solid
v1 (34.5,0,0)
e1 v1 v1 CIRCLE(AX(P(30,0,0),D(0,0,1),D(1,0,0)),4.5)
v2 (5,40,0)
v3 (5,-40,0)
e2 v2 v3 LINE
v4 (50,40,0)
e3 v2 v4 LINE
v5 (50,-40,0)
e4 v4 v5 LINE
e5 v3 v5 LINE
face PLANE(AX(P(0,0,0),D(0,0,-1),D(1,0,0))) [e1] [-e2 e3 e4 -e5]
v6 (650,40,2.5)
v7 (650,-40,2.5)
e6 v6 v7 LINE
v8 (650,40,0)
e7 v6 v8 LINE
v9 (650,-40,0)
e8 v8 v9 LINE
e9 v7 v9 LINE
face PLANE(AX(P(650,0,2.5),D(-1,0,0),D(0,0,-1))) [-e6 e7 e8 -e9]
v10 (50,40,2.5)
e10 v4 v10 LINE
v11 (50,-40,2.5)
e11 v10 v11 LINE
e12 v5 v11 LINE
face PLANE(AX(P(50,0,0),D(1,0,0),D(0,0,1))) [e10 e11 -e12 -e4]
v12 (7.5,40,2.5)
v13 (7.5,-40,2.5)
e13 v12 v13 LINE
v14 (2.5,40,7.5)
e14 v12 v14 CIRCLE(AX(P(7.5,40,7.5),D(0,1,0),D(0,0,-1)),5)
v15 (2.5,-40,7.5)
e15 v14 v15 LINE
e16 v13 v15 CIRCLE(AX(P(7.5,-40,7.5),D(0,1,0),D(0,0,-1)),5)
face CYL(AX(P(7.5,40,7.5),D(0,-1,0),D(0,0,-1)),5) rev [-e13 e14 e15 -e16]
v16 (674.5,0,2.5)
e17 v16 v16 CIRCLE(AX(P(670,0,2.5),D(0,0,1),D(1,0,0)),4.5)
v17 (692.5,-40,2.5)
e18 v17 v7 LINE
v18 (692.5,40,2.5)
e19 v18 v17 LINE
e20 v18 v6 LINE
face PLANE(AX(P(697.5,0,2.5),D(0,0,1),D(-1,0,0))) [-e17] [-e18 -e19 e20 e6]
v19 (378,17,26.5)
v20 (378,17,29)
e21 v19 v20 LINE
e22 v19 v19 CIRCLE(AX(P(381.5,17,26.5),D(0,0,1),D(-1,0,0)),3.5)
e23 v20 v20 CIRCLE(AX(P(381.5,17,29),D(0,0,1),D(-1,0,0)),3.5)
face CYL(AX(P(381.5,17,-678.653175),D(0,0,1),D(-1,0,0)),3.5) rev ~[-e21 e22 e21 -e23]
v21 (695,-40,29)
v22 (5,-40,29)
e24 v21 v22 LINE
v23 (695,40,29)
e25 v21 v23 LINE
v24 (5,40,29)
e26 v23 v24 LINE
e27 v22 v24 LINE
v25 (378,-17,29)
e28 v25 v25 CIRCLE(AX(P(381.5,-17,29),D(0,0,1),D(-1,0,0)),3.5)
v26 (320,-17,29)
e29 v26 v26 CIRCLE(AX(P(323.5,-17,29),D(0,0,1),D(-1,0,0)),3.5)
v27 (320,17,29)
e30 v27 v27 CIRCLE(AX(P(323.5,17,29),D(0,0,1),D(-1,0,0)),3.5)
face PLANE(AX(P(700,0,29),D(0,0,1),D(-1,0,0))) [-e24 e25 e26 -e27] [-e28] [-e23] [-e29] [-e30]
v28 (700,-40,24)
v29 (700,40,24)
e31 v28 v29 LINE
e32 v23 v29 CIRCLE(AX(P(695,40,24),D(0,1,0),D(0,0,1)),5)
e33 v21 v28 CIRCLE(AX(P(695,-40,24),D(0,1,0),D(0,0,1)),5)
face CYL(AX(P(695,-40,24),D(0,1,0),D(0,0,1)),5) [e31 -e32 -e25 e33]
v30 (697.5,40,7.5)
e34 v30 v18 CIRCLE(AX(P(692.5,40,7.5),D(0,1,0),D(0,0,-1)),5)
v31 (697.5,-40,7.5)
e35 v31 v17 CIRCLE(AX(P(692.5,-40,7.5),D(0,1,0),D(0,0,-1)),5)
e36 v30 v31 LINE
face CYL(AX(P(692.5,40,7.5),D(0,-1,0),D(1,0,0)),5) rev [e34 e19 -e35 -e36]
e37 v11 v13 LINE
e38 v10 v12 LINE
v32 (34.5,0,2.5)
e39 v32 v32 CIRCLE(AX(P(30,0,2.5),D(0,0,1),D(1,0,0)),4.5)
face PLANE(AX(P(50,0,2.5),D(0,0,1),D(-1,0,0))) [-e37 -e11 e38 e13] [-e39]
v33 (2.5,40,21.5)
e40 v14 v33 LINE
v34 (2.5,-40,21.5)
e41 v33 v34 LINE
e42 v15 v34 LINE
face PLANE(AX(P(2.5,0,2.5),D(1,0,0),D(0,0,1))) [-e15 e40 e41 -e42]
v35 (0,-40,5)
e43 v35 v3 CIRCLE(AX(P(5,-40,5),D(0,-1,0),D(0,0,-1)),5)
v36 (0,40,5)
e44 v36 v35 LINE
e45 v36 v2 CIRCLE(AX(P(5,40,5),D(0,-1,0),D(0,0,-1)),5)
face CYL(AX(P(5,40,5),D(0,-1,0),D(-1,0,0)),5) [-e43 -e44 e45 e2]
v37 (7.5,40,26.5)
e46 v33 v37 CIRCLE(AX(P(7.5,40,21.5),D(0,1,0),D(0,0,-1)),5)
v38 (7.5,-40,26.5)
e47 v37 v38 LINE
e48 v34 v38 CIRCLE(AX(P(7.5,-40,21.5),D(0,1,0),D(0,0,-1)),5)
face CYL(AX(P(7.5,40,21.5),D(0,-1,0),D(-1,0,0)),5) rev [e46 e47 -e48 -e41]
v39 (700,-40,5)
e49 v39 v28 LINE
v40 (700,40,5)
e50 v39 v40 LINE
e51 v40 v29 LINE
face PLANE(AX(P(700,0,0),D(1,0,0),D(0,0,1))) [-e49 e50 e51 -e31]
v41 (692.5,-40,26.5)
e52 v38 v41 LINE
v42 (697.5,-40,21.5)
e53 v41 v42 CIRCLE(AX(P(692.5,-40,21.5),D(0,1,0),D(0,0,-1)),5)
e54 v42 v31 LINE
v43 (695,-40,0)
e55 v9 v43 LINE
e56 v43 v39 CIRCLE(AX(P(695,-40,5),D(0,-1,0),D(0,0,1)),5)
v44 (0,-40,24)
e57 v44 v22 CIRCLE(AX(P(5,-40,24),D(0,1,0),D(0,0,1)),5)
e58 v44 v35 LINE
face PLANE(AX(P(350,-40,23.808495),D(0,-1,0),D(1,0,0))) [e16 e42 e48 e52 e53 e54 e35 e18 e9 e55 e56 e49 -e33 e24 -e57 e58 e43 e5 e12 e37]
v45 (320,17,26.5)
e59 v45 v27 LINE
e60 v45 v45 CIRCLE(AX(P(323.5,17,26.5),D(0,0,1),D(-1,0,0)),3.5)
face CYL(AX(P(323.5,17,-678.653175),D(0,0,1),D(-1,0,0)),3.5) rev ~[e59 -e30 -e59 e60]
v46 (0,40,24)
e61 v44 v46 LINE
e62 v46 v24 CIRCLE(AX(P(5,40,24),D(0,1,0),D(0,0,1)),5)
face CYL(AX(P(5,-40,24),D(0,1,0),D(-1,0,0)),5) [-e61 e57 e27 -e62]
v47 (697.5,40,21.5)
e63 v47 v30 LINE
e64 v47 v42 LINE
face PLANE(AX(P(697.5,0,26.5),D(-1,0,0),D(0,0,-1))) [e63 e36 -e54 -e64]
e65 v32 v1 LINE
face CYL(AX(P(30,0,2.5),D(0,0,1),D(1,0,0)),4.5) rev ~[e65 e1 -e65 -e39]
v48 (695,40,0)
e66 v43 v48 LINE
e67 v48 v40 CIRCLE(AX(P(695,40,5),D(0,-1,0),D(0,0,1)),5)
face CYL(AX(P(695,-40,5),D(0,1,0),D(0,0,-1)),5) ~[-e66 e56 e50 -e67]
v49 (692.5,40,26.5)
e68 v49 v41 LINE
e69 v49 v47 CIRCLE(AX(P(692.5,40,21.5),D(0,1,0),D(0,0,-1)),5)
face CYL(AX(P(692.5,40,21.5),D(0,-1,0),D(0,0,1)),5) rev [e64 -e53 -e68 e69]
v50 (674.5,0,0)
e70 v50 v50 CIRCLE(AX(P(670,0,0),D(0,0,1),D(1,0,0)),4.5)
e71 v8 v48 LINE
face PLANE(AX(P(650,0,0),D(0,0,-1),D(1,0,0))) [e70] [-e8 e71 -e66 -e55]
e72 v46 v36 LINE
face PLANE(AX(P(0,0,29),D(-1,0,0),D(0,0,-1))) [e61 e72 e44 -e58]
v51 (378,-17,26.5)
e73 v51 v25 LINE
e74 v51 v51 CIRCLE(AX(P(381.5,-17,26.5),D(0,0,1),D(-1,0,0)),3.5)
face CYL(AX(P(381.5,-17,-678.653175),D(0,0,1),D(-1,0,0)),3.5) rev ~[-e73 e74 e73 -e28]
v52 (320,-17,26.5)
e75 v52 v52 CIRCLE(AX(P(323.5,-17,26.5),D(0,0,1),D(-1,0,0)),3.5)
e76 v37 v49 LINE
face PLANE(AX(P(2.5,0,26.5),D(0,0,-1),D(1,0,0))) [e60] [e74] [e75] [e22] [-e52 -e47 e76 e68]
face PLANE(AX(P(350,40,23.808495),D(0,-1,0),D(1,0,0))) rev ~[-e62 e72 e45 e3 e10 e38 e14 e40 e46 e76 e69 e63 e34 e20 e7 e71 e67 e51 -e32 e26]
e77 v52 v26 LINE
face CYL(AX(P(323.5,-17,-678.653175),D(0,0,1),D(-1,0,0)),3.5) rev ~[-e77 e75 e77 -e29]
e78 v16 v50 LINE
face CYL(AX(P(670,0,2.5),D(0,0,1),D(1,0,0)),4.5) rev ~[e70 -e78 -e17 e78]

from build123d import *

# Parameters (mm, degrees)
F1_DEPTH = 40
F4_D     = 9
F4_DEPTH = 12
F4_TIP   = 2.7038727856
F5_D     = 9
F5_DEPTH = 12
F5_TIP   = 2.7038727856
F7_D     = 7
F8_R     = 5


# Not quite as in the source:
# - a feature names something its author has since deleted; it is built from what else it names


with BuildPart() as f1:
    # F0 (on Front) → F1 (new body, symmetric)
    with BuildSketch(Plane.XZ):
        Polygon((0, 29), (0, 0), (50, 0), (50, 2.5), (2.5, 2.5), (2.5, 26.5), (697.5, 26.5), (697.5, 2.5), (650, 2.5), (650, 0), (700, 0), (700, 29), align=None)
    extrude(amount=F1_DEPTH, both=True)

    # F4 (one way)
    with BuildSketch(Plane.XY.offset(2.5)):
        with Locations((670, 0)):
            Circle(F4_D / 2)
    extrude(amount=-F4_DEPTH, mode=Mode.SUBTRACT)
    with Locations(Plane.XY.offset(2.5)):
        with Locations((670, 0)):
            with Locations((0, 0, -(F4_DEPTH + F4_TIP / 2))):  # 118° drill point
                Cone(0, F4_D / 2, F4_TIP, mode=Mode.SUBTRACT)

    # F5 (one way)
    with BuildSketch(Plane.XY.offset(2.5)):
        with Locations((30, 0)):
            Circle(F5_D / 2)
    extrude(amount=-F5_DEPTH, mode=Mode.SUBTRACT)
    with Locations(Plane.XY.offset(2.5)):
        with Locations((30, 0)):
            with Locations((0, 0, -(F5_DEPTH + F5_TIP / 2))):  # 118° drill point
                Cone(0, F5_D / 2, F5_TIP, mode=Mode.SUBTRACT)

    # F7 (through all)
    with Locations(Plane(origin=(0, 0, 26.5), x_dir=(1, 0, 0), z_dir=(0, 0, -1))):
        with Locations((381.5, -17), (323.5, -17), (323.5, 17), (381.5, 17)):
            Hole(F7_D / 2)

    # F8
    f8_edges = [f1.edges().sort_by_distance(p)[0] for p in [
        (0, 0, 29),
        (0, 0, 0),
        (700, 0, 29),
        (700, 0, 0),
        (2.5, 0, 2.5),
        (2.5, 0, 26.5),
        (697.5, 0, 2.5),
        (697.5, 0, 26.5),
    ]]
    fillet(f8_edges, radius=F8_R)


solid = f1.part
